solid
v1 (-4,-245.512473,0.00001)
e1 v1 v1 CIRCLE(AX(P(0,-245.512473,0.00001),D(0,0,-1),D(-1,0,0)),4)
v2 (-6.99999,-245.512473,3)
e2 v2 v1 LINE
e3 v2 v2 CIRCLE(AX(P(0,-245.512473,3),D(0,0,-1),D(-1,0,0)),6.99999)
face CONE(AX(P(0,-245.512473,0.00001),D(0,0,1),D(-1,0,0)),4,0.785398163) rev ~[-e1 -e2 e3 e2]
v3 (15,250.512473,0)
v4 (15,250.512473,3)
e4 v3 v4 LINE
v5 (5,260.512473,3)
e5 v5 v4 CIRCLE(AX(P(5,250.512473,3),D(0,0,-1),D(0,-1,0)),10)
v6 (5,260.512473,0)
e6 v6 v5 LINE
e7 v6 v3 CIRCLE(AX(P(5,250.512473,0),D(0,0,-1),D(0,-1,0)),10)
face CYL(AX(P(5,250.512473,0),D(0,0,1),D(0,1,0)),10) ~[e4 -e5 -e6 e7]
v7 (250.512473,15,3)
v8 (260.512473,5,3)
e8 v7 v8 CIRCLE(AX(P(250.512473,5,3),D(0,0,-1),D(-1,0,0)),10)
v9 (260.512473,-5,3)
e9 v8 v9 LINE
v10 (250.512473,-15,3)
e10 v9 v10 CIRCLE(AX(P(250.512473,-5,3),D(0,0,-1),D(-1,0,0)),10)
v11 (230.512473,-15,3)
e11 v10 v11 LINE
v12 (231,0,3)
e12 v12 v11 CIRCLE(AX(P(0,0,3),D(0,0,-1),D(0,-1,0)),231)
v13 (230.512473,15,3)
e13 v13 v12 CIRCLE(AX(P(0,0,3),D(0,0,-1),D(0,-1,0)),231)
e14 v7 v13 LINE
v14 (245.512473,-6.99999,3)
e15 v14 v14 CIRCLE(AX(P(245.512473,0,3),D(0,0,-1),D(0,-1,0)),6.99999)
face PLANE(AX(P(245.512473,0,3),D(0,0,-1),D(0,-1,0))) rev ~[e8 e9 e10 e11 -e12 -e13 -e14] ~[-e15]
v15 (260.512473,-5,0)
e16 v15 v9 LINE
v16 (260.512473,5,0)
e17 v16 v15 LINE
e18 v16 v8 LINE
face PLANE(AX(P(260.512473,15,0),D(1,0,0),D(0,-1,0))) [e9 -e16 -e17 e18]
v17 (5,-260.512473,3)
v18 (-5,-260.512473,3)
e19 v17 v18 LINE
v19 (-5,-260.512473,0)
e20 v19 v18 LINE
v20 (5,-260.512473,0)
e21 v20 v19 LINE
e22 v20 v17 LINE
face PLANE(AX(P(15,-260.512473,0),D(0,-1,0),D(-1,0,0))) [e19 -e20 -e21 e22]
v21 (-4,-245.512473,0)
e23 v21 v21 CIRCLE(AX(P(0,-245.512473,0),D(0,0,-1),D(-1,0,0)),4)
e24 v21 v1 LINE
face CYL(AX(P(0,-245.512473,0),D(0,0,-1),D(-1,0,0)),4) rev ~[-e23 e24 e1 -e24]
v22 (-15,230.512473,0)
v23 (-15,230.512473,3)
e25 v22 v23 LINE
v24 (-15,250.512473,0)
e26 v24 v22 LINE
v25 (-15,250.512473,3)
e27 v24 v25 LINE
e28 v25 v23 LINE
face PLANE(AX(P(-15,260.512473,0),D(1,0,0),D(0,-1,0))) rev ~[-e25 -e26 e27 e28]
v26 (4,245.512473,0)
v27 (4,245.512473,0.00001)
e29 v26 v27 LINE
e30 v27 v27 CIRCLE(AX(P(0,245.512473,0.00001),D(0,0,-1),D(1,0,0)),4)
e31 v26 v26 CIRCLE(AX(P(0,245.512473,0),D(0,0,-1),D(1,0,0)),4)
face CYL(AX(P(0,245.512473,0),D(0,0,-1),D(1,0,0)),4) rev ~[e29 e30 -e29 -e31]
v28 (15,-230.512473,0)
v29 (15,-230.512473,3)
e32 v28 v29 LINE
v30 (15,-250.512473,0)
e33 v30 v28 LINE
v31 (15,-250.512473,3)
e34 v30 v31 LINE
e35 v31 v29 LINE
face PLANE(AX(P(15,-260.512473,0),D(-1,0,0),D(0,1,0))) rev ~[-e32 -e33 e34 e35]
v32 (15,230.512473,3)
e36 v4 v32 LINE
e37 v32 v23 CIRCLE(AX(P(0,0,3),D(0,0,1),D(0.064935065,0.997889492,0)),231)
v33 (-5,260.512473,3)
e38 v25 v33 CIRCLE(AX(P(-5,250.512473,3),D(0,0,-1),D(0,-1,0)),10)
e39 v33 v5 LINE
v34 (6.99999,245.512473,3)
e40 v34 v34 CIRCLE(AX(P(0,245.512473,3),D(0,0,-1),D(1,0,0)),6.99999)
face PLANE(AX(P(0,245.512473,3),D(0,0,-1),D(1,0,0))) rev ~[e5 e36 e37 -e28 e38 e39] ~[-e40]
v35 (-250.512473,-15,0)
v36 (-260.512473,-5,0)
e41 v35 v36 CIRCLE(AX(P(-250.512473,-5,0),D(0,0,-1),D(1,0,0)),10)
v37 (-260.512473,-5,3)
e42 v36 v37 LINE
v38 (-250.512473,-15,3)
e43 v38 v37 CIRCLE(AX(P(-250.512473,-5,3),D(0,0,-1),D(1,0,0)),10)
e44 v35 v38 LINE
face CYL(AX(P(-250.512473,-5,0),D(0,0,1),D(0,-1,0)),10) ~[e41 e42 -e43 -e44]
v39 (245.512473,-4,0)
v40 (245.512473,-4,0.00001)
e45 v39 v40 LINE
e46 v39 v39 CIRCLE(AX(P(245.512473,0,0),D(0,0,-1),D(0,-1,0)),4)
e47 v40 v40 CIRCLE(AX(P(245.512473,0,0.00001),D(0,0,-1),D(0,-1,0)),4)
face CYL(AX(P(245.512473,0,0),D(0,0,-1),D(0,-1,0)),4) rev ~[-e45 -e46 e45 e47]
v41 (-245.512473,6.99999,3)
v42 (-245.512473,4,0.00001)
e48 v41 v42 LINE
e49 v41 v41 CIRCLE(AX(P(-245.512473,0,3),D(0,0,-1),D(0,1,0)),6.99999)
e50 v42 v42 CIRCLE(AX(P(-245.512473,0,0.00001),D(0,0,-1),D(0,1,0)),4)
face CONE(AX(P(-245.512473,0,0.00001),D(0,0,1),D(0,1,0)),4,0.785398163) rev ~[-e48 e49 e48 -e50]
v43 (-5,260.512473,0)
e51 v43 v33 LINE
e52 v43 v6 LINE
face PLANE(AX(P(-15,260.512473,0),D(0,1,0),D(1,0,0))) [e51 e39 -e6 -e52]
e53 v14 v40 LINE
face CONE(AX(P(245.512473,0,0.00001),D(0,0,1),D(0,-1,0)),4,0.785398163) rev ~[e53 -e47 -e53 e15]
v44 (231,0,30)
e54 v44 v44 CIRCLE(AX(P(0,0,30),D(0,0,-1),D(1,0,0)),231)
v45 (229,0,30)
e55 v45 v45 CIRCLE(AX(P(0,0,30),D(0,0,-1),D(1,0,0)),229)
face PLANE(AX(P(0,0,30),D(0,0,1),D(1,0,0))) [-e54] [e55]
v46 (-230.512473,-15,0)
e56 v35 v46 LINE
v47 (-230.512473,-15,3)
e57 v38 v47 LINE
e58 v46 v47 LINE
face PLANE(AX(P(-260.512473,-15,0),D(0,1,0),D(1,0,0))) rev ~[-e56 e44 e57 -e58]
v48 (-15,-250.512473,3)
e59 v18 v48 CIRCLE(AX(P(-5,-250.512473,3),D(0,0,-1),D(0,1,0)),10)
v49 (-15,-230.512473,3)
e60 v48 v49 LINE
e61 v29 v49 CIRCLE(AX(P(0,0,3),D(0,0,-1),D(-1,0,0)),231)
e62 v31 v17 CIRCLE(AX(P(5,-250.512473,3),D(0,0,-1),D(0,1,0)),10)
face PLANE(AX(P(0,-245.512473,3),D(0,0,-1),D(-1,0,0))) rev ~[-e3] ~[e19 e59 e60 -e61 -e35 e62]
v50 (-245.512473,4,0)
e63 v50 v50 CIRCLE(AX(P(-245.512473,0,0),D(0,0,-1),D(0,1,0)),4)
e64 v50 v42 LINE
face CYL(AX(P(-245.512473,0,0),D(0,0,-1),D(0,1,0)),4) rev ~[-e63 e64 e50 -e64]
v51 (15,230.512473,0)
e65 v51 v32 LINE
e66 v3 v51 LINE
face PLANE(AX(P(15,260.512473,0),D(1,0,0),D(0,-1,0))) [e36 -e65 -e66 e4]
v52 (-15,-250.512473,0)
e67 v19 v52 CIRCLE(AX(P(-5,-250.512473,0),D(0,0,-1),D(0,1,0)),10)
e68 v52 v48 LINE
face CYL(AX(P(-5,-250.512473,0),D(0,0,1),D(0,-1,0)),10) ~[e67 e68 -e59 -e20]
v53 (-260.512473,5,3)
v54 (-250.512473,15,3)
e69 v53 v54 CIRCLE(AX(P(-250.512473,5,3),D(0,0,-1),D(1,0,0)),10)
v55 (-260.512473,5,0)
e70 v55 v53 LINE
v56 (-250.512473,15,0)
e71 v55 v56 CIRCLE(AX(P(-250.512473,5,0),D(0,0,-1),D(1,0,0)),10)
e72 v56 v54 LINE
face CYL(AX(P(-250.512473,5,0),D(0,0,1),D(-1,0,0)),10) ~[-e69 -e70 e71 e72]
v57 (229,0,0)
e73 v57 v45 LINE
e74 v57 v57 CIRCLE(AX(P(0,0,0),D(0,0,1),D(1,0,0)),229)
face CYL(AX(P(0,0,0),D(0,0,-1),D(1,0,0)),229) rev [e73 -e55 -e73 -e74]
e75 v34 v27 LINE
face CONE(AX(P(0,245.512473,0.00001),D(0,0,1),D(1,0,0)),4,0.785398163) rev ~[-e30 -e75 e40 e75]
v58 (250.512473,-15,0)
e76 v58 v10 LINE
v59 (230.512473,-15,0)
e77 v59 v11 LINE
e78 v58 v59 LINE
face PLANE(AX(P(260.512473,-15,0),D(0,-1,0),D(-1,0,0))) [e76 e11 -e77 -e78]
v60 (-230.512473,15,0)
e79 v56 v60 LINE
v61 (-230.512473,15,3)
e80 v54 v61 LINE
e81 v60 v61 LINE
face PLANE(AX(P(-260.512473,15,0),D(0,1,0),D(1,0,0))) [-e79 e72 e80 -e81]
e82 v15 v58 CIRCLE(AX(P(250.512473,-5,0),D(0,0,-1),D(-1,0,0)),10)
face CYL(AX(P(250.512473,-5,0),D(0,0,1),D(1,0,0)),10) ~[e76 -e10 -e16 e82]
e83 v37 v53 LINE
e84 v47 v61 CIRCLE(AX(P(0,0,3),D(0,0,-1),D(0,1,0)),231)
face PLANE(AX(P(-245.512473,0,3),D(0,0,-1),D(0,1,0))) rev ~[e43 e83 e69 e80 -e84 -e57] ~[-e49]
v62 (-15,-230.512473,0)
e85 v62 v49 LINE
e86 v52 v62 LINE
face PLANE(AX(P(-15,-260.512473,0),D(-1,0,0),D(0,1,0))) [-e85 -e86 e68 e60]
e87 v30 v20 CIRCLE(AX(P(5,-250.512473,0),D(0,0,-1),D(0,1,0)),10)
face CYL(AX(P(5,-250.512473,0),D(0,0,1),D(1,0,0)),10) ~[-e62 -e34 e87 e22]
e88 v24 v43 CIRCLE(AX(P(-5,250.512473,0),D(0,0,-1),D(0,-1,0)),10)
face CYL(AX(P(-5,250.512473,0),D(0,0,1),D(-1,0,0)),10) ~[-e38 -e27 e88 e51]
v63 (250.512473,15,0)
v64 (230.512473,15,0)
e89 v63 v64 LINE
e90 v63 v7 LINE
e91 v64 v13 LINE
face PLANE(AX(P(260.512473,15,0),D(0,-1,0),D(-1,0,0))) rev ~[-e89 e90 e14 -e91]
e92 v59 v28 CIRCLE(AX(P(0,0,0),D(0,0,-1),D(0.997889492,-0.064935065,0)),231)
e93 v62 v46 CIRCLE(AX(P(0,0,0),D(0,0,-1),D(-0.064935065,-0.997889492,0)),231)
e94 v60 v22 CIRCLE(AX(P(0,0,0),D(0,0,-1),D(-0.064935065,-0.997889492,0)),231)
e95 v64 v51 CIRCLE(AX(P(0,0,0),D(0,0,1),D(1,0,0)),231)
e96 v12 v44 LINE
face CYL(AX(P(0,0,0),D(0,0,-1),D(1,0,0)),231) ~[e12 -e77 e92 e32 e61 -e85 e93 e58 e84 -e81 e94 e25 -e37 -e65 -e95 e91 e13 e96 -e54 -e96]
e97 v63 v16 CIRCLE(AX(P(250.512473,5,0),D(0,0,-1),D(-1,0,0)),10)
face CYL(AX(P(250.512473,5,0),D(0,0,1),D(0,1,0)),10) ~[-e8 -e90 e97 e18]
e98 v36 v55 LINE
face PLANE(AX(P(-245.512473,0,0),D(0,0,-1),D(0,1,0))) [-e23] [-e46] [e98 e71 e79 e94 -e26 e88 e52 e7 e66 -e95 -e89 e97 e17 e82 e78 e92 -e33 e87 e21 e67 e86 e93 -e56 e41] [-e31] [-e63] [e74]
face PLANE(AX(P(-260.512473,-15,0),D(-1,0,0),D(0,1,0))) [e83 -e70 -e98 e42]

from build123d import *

# Parameters (mm, degrees)
F0_R     = 231
F0_R_2   = 229
F1_DEPTH = 30
F2_W     = 30
F2_H     = 30
F3_DEPTH = 3
F4_R     = 4
F5_DEPTH = 25
F6_R     = 10
F8_COUNT = 4
F9_SIZE  = 2.99999


# Not quite as in the source:
# - a fillet or chamfer is up to 0.001 mm smaller than in the source, because OpenCascade refuses the exact size


with BuildPart() as f1:
    # F0 (on Top) → F1 (new body)
    with BuildSketch(Plane.XY):
        Circle(F0_R)
        Circle(F0_R_2, mode=Mode.SUBTRACT)
    extrude(amount=F1_DEPTH)

    # F2 (on face) → F3 (join)
    with BuildSketch(Plane(origin=(0, 0, 0), x_dir=(1, 0, 0), z_dir=(0, 0, -1))):
        with Locations((0, -245.5124725476)):
            Rectangle(F2_W, F2_H)
    extrude(amount=-F3_DEPTH)

    # F4 (on face) → F5 (cut)
    with BuildSketch(Plane(origin=(0, 0, 0), x_dir=(1, 0, 0), z_dir=(0, 0, -1))):
        with Locations((0, -245.5124725476)):
            Circle(F4_R)
    extrude(amount=-F5_DEPTH, mode=Mode.SUBTRACT)

    # F6
    f6_edges = [f1.edges().sort_by_distance(p)[0] for p in [
        (-15, 260.512473, 1.5),
        (15, 260.512473, 1.5),
    ]]
    fillet(f6_edges, radius=F6_R)

    # F8: F1 ×4 about axis
    f8_axis = Axis((0, 0, -51.1162020266), (0, 0, -1))


with BuildPart() as f1_1:
    add(f1.part)
    for i in range(1, F8_COUNT):
        add(f1.part.rotate(f8_axis, i * 360 / F8_COUNT))

    # F9 (size 3 in the source; OpenCascade refuses exactly that, so slightly less here)
    f9_edges = [f1_1.edges().sort_by_distance(p)[0] for p in [
        (-245.512473, -4, 3),
        (-4, 245.512473, 3),
        (245.512473, 4, 3),
        (4, -245.512473, 3),
    ]]
    chamfer(f9_edges, length=F9_SIZE)


solid = f1_1.part
